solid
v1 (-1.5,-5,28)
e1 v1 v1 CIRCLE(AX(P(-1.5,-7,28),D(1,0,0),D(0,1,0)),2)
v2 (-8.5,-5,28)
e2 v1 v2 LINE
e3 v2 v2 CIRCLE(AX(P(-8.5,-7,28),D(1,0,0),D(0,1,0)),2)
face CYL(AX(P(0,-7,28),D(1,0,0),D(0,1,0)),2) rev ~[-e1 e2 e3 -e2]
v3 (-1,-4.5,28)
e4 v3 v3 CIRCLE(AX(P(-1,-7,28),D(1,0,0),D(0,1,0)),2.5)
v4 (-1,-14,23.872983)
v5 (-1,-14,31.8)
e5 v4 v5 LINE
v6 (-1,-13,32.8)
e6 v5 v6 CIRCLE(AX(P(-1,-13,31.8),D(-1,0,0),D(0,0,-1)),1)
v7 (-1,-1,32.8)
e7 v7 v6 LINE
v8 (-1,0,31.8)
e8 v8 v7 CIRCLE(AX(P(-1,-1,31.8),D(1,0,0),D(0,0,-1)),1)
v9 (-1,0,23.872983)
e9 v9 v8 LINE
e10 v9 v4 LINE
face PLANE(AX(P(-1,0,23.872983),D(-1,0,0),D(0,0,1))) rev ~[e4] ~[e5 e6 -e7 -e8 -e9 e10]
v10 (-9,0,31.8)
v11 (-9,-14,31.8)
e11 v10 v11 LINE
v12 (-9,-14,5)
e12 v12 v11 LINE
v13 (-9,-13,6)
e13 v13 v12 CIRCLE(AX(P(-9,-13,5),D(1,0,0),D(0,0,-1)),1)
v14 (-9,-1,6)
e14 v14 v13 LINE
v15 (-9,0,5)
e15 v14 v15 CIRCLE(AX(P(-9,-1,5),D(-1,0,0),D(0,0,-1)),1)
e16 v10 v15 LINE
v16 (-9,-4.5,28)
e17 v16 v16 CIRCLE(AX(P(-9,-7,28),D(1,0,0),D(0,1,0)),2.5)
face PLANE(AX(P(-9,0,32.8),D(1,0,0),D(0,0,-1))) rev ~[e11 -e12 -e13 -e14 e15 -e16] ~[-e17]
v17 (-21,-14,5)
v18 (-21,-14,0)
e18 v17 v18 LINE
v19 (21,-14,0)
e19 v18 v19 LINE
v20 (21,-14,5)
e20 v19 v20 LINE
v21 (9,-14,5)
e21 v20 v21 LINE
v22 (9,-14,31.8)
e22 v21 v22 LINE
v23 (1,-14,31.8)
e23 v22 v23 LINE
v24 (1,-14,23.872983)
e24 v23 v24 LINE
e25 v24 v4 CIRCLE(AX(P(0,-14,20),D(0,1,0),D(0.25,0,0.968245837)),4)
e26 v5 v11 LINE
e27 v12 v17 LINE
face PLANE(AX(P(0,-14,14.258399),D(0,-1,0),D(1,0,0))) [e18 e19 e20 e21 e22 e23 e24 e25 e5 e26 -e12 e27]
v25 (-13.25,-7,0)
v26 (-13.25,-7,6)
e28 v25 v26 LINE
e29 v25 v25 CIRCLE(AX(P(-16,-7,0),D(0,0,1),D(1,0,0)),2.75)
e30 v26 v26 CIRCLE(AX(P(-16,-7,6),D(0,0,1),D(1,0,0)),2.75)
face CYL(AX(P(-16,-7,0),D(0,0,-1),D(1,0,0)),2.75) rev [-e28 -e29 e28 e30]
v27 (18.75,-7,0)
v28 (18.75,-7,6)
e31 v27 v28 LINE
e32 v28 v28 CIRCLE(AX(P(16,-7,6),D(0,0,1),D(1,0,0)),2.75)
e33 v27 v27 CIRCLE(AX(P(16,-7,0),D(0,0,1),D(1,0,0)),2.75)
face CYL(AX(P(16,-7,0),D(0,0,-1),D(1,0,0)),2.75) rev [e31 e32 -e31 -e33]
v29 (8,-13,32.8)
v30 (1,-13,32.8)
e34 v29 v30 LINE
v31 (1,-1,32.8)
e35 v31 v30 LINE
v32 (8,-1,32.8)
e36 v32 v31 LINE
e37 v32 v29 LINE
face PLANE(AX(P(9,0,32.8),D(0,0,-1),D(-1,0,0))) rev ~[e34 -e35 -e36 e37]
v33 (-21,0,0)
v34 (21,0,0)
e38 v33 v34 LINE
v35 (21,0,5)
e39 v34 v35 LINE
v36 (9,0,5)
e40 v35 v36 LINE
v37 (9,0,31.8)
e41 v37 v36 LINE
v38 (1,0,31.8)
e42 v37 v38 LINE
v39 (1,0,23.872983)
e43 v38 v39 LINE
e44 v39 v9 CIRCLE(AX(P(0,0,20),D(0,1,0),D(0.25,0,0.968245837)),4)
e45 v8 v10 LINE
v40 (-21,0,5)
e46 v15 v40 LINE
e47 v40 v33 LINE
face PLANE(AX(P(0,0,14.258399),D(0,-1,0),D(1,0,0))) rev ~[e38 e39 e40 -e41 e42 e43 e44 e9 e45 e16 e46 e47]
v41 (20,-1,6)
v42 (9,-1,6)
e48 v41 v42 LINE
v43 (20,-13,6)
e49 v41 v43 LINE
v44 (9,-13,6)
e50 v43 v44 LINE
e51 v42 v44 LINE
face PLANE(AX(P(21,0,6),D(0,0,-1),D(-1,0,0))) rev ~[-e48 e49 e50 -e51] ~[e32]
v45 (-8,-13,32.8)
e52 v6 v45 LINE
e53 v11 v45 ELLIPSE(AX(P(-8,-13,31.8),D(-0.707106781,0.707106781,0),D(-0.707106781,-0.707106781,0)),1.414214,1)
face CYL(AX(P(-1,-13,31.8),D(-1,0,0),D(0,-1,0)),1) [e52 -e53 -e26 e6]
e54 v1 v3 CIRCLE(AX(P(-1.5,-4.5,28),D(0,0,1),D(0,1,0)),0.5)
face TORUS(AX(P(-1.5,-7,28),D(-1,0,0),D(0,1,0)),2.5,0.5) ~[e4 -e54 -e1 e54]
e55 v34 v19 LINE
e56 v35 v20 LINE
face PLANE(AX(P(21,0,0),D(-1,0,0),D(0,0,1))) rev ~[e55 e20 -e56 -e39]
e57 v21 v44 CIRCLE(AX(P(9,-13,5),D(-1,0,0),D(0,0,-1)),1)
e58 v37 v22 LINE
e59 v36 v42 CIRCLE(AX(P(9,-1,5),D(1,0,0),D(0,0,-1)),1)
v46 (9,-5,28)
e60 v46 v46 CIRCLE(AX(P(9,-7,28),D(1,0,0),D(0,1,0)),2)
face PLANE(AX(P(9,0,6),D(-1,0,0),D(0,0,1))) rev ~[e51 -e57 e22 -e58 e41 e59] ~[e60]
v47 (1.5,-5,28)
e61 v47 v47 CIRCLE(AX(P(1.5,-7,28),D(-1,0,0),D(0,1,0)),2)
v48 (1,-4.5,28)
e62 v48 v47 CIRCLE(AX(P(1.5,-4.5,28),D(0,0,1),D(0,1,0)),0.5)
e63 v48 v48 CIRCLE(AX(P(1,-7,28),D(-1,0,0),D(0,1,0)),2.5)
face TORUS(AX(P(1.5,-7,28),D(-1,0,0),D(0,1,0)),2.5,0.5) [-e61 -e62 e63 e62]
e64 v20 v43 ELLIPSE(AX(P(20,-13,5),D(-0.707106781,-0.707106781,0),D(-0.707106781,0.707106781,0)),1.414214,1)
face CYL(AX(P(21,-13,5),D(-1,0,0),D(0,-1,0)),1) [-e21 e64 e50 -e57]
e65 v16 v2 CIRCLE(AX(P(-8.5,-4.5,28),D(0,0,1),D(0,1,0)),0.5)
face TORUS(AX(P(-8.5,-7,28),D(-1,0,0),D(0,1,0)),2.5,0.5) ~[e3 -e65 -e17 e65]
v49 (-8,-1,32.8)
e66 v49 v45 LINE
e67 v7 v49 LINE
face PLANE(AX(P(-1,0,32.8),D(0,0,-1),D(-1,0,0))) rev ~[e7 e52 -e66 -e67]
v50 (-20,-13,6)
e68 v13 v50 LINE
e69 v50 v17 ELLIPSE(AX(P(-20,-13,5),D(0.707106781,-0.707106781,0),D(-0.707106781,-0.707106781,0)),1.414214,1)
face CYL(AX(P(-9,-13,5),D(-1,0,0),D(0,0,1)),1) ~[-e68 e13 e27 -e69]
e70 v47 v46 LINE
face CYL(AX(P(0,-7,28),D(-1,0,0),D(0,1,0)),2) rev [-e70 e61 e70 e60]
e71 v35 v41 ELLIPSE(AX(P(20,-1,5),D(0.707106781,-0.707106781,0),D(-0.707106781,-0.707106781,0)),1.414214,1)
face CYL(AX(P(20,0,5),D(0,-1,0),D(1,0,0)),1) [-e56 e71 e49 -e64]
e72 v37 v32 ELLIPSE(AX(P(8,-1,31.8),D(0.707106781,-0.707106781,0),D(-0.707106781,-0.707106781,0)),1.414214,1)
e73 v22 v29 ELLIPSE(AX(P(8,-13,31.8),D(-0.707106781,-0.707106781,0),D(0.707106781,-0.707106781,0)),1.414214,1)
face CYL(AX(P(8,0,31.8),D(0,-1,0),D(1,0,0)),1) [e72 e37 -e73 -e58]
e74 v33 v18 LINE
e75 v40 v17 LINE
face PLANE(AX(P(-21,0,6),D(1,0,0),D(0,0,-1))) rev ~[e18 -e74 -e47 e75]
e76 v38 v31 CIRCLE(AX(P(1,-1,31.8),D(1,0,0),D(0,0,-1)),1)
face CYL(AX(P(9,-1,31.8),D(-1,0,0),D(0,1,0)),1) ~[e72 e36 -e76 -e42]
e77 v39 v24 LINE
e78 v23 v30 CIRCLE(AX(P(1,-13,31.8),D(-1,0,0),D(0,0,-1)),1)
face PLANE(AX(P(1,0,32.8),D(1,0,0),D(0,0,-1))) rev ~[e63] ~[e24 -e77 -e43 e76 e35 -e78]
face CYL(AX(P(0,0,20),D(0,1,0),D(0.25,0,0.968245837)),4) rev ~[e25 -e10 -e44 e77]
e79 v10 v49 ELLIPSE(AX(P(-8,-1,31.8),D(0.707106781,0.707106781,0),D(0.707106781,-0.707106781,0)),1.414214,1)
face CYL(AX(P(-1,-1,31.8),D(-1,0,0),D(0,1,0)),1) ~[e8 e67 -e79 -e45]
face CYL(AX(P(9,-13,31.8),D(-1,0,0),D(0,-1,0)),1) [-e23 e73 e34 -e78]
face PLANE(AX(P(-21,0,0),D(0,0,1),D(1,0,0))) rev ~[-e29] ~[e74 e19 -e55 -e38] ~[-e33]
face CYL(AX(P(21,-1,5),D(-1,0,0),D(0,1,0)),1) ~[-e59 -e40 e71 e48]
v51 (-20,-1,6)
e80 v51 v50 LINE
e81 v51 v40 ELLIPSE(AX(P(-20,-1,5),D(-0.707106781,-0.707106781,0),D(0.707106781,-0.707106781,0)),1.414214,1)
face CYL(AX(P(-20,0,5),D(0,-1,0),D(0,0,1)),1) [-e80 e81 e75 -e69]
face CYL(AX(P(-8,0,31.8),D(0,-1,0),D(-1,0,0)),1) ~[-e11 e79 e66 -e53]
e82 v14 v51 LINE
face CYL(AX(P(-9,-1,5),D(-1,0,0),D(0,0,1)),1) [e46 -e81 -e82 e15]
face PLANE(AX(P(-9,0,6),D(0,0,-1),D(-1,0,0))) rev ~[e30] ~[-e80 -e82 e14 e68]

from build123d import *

# Parameters (mm, degrees)
F1_DEPTH      = 14
F2_R          = 2.75
F3_DEPTH      = 6
F4_R          = 1
F5_R          = 2
F6_DEPTH      = 10
F6_DEPTH_BACK = 9
F7_R          = 0.5


with BuildPart() as f1:
    # F0 (on Front) → F1 (new body)
    with BuildSketch(Plane.XZ):
        with BuildLine():
            Line((-9, 6), (-21, 6))
            Line((-21, 6), (-21, 0))
            Line((-21, 0), (21, 0))
            Line((21, 0), (21, 6))
            Line((21, 6), (9, 6))
            Line((9, 6), (9, 32.8))
            Line((9, 32.8), (1, 32.8))
            Line((1, 32.8), (1, 23.8729833462))
            ThreePointArc((1, 23.8729833462), (0, 16), (-1, 23.8729833462))
            Line((-1, 23.8729833462), (-1, 32.8))
            Line((-1, 32.8), (-9, 32.8))
            Line((-9, 32.8), (-9, 6))
        make_face()
    extrude(amount=F1_DEPTH)

    # F2 (on Top) → F3 (cut)
    with BuildSketch(Plane.XY):
        with Locations((16, -7)):
            Circle(F2_R)
        with Locations((-16, -7)):
            Circle(F2_R)
    extrude(amount=F3_DEPTH, mode=Mode.SUBTRACT)

    # F4
    f4_edges = [f1.edges().sort_by_distance(p)[0] for p in [
        (-21, -7, 6),
        (-15, 0, 6),
        (-15, -14, 6),
        (15, -14, 6),
        (21, -7, 6),
        (15, 0, 6),
        (-9, -7, 32.8),
        (9, -7, 32.8),
        (5, 0, 32.8),
        (-5, 0, 32.8),
        (-5, -14, 32.8),
        (5, -14, 32.8),
    ]]
    fillet(f4_edges, radius=F4_R)

    # F5 (on Right) → F6 (cut, two sides)
    with BuildSketch(Plane.YZ) as f6_sk:
        with Locations((-7, 28)):
            Circle(F5_R)
    extrude(amount=-F6_DEPTH, mode=Mode.SUBTRACT)
    extrude(f6_sk.sketch, amount=F6_DEPTH_BACK, mode=Mode.SUBTRACT)

    # F7
    f7_edges = [f1.edges().sort_by_distance(p)[0] for p in [
        (1, -9, 28),
        (-9, -9, 28),
        (-1, -9, 28),
    ]]
    fillet(f7_edges, radius=F7_R)


solid = f1.part
